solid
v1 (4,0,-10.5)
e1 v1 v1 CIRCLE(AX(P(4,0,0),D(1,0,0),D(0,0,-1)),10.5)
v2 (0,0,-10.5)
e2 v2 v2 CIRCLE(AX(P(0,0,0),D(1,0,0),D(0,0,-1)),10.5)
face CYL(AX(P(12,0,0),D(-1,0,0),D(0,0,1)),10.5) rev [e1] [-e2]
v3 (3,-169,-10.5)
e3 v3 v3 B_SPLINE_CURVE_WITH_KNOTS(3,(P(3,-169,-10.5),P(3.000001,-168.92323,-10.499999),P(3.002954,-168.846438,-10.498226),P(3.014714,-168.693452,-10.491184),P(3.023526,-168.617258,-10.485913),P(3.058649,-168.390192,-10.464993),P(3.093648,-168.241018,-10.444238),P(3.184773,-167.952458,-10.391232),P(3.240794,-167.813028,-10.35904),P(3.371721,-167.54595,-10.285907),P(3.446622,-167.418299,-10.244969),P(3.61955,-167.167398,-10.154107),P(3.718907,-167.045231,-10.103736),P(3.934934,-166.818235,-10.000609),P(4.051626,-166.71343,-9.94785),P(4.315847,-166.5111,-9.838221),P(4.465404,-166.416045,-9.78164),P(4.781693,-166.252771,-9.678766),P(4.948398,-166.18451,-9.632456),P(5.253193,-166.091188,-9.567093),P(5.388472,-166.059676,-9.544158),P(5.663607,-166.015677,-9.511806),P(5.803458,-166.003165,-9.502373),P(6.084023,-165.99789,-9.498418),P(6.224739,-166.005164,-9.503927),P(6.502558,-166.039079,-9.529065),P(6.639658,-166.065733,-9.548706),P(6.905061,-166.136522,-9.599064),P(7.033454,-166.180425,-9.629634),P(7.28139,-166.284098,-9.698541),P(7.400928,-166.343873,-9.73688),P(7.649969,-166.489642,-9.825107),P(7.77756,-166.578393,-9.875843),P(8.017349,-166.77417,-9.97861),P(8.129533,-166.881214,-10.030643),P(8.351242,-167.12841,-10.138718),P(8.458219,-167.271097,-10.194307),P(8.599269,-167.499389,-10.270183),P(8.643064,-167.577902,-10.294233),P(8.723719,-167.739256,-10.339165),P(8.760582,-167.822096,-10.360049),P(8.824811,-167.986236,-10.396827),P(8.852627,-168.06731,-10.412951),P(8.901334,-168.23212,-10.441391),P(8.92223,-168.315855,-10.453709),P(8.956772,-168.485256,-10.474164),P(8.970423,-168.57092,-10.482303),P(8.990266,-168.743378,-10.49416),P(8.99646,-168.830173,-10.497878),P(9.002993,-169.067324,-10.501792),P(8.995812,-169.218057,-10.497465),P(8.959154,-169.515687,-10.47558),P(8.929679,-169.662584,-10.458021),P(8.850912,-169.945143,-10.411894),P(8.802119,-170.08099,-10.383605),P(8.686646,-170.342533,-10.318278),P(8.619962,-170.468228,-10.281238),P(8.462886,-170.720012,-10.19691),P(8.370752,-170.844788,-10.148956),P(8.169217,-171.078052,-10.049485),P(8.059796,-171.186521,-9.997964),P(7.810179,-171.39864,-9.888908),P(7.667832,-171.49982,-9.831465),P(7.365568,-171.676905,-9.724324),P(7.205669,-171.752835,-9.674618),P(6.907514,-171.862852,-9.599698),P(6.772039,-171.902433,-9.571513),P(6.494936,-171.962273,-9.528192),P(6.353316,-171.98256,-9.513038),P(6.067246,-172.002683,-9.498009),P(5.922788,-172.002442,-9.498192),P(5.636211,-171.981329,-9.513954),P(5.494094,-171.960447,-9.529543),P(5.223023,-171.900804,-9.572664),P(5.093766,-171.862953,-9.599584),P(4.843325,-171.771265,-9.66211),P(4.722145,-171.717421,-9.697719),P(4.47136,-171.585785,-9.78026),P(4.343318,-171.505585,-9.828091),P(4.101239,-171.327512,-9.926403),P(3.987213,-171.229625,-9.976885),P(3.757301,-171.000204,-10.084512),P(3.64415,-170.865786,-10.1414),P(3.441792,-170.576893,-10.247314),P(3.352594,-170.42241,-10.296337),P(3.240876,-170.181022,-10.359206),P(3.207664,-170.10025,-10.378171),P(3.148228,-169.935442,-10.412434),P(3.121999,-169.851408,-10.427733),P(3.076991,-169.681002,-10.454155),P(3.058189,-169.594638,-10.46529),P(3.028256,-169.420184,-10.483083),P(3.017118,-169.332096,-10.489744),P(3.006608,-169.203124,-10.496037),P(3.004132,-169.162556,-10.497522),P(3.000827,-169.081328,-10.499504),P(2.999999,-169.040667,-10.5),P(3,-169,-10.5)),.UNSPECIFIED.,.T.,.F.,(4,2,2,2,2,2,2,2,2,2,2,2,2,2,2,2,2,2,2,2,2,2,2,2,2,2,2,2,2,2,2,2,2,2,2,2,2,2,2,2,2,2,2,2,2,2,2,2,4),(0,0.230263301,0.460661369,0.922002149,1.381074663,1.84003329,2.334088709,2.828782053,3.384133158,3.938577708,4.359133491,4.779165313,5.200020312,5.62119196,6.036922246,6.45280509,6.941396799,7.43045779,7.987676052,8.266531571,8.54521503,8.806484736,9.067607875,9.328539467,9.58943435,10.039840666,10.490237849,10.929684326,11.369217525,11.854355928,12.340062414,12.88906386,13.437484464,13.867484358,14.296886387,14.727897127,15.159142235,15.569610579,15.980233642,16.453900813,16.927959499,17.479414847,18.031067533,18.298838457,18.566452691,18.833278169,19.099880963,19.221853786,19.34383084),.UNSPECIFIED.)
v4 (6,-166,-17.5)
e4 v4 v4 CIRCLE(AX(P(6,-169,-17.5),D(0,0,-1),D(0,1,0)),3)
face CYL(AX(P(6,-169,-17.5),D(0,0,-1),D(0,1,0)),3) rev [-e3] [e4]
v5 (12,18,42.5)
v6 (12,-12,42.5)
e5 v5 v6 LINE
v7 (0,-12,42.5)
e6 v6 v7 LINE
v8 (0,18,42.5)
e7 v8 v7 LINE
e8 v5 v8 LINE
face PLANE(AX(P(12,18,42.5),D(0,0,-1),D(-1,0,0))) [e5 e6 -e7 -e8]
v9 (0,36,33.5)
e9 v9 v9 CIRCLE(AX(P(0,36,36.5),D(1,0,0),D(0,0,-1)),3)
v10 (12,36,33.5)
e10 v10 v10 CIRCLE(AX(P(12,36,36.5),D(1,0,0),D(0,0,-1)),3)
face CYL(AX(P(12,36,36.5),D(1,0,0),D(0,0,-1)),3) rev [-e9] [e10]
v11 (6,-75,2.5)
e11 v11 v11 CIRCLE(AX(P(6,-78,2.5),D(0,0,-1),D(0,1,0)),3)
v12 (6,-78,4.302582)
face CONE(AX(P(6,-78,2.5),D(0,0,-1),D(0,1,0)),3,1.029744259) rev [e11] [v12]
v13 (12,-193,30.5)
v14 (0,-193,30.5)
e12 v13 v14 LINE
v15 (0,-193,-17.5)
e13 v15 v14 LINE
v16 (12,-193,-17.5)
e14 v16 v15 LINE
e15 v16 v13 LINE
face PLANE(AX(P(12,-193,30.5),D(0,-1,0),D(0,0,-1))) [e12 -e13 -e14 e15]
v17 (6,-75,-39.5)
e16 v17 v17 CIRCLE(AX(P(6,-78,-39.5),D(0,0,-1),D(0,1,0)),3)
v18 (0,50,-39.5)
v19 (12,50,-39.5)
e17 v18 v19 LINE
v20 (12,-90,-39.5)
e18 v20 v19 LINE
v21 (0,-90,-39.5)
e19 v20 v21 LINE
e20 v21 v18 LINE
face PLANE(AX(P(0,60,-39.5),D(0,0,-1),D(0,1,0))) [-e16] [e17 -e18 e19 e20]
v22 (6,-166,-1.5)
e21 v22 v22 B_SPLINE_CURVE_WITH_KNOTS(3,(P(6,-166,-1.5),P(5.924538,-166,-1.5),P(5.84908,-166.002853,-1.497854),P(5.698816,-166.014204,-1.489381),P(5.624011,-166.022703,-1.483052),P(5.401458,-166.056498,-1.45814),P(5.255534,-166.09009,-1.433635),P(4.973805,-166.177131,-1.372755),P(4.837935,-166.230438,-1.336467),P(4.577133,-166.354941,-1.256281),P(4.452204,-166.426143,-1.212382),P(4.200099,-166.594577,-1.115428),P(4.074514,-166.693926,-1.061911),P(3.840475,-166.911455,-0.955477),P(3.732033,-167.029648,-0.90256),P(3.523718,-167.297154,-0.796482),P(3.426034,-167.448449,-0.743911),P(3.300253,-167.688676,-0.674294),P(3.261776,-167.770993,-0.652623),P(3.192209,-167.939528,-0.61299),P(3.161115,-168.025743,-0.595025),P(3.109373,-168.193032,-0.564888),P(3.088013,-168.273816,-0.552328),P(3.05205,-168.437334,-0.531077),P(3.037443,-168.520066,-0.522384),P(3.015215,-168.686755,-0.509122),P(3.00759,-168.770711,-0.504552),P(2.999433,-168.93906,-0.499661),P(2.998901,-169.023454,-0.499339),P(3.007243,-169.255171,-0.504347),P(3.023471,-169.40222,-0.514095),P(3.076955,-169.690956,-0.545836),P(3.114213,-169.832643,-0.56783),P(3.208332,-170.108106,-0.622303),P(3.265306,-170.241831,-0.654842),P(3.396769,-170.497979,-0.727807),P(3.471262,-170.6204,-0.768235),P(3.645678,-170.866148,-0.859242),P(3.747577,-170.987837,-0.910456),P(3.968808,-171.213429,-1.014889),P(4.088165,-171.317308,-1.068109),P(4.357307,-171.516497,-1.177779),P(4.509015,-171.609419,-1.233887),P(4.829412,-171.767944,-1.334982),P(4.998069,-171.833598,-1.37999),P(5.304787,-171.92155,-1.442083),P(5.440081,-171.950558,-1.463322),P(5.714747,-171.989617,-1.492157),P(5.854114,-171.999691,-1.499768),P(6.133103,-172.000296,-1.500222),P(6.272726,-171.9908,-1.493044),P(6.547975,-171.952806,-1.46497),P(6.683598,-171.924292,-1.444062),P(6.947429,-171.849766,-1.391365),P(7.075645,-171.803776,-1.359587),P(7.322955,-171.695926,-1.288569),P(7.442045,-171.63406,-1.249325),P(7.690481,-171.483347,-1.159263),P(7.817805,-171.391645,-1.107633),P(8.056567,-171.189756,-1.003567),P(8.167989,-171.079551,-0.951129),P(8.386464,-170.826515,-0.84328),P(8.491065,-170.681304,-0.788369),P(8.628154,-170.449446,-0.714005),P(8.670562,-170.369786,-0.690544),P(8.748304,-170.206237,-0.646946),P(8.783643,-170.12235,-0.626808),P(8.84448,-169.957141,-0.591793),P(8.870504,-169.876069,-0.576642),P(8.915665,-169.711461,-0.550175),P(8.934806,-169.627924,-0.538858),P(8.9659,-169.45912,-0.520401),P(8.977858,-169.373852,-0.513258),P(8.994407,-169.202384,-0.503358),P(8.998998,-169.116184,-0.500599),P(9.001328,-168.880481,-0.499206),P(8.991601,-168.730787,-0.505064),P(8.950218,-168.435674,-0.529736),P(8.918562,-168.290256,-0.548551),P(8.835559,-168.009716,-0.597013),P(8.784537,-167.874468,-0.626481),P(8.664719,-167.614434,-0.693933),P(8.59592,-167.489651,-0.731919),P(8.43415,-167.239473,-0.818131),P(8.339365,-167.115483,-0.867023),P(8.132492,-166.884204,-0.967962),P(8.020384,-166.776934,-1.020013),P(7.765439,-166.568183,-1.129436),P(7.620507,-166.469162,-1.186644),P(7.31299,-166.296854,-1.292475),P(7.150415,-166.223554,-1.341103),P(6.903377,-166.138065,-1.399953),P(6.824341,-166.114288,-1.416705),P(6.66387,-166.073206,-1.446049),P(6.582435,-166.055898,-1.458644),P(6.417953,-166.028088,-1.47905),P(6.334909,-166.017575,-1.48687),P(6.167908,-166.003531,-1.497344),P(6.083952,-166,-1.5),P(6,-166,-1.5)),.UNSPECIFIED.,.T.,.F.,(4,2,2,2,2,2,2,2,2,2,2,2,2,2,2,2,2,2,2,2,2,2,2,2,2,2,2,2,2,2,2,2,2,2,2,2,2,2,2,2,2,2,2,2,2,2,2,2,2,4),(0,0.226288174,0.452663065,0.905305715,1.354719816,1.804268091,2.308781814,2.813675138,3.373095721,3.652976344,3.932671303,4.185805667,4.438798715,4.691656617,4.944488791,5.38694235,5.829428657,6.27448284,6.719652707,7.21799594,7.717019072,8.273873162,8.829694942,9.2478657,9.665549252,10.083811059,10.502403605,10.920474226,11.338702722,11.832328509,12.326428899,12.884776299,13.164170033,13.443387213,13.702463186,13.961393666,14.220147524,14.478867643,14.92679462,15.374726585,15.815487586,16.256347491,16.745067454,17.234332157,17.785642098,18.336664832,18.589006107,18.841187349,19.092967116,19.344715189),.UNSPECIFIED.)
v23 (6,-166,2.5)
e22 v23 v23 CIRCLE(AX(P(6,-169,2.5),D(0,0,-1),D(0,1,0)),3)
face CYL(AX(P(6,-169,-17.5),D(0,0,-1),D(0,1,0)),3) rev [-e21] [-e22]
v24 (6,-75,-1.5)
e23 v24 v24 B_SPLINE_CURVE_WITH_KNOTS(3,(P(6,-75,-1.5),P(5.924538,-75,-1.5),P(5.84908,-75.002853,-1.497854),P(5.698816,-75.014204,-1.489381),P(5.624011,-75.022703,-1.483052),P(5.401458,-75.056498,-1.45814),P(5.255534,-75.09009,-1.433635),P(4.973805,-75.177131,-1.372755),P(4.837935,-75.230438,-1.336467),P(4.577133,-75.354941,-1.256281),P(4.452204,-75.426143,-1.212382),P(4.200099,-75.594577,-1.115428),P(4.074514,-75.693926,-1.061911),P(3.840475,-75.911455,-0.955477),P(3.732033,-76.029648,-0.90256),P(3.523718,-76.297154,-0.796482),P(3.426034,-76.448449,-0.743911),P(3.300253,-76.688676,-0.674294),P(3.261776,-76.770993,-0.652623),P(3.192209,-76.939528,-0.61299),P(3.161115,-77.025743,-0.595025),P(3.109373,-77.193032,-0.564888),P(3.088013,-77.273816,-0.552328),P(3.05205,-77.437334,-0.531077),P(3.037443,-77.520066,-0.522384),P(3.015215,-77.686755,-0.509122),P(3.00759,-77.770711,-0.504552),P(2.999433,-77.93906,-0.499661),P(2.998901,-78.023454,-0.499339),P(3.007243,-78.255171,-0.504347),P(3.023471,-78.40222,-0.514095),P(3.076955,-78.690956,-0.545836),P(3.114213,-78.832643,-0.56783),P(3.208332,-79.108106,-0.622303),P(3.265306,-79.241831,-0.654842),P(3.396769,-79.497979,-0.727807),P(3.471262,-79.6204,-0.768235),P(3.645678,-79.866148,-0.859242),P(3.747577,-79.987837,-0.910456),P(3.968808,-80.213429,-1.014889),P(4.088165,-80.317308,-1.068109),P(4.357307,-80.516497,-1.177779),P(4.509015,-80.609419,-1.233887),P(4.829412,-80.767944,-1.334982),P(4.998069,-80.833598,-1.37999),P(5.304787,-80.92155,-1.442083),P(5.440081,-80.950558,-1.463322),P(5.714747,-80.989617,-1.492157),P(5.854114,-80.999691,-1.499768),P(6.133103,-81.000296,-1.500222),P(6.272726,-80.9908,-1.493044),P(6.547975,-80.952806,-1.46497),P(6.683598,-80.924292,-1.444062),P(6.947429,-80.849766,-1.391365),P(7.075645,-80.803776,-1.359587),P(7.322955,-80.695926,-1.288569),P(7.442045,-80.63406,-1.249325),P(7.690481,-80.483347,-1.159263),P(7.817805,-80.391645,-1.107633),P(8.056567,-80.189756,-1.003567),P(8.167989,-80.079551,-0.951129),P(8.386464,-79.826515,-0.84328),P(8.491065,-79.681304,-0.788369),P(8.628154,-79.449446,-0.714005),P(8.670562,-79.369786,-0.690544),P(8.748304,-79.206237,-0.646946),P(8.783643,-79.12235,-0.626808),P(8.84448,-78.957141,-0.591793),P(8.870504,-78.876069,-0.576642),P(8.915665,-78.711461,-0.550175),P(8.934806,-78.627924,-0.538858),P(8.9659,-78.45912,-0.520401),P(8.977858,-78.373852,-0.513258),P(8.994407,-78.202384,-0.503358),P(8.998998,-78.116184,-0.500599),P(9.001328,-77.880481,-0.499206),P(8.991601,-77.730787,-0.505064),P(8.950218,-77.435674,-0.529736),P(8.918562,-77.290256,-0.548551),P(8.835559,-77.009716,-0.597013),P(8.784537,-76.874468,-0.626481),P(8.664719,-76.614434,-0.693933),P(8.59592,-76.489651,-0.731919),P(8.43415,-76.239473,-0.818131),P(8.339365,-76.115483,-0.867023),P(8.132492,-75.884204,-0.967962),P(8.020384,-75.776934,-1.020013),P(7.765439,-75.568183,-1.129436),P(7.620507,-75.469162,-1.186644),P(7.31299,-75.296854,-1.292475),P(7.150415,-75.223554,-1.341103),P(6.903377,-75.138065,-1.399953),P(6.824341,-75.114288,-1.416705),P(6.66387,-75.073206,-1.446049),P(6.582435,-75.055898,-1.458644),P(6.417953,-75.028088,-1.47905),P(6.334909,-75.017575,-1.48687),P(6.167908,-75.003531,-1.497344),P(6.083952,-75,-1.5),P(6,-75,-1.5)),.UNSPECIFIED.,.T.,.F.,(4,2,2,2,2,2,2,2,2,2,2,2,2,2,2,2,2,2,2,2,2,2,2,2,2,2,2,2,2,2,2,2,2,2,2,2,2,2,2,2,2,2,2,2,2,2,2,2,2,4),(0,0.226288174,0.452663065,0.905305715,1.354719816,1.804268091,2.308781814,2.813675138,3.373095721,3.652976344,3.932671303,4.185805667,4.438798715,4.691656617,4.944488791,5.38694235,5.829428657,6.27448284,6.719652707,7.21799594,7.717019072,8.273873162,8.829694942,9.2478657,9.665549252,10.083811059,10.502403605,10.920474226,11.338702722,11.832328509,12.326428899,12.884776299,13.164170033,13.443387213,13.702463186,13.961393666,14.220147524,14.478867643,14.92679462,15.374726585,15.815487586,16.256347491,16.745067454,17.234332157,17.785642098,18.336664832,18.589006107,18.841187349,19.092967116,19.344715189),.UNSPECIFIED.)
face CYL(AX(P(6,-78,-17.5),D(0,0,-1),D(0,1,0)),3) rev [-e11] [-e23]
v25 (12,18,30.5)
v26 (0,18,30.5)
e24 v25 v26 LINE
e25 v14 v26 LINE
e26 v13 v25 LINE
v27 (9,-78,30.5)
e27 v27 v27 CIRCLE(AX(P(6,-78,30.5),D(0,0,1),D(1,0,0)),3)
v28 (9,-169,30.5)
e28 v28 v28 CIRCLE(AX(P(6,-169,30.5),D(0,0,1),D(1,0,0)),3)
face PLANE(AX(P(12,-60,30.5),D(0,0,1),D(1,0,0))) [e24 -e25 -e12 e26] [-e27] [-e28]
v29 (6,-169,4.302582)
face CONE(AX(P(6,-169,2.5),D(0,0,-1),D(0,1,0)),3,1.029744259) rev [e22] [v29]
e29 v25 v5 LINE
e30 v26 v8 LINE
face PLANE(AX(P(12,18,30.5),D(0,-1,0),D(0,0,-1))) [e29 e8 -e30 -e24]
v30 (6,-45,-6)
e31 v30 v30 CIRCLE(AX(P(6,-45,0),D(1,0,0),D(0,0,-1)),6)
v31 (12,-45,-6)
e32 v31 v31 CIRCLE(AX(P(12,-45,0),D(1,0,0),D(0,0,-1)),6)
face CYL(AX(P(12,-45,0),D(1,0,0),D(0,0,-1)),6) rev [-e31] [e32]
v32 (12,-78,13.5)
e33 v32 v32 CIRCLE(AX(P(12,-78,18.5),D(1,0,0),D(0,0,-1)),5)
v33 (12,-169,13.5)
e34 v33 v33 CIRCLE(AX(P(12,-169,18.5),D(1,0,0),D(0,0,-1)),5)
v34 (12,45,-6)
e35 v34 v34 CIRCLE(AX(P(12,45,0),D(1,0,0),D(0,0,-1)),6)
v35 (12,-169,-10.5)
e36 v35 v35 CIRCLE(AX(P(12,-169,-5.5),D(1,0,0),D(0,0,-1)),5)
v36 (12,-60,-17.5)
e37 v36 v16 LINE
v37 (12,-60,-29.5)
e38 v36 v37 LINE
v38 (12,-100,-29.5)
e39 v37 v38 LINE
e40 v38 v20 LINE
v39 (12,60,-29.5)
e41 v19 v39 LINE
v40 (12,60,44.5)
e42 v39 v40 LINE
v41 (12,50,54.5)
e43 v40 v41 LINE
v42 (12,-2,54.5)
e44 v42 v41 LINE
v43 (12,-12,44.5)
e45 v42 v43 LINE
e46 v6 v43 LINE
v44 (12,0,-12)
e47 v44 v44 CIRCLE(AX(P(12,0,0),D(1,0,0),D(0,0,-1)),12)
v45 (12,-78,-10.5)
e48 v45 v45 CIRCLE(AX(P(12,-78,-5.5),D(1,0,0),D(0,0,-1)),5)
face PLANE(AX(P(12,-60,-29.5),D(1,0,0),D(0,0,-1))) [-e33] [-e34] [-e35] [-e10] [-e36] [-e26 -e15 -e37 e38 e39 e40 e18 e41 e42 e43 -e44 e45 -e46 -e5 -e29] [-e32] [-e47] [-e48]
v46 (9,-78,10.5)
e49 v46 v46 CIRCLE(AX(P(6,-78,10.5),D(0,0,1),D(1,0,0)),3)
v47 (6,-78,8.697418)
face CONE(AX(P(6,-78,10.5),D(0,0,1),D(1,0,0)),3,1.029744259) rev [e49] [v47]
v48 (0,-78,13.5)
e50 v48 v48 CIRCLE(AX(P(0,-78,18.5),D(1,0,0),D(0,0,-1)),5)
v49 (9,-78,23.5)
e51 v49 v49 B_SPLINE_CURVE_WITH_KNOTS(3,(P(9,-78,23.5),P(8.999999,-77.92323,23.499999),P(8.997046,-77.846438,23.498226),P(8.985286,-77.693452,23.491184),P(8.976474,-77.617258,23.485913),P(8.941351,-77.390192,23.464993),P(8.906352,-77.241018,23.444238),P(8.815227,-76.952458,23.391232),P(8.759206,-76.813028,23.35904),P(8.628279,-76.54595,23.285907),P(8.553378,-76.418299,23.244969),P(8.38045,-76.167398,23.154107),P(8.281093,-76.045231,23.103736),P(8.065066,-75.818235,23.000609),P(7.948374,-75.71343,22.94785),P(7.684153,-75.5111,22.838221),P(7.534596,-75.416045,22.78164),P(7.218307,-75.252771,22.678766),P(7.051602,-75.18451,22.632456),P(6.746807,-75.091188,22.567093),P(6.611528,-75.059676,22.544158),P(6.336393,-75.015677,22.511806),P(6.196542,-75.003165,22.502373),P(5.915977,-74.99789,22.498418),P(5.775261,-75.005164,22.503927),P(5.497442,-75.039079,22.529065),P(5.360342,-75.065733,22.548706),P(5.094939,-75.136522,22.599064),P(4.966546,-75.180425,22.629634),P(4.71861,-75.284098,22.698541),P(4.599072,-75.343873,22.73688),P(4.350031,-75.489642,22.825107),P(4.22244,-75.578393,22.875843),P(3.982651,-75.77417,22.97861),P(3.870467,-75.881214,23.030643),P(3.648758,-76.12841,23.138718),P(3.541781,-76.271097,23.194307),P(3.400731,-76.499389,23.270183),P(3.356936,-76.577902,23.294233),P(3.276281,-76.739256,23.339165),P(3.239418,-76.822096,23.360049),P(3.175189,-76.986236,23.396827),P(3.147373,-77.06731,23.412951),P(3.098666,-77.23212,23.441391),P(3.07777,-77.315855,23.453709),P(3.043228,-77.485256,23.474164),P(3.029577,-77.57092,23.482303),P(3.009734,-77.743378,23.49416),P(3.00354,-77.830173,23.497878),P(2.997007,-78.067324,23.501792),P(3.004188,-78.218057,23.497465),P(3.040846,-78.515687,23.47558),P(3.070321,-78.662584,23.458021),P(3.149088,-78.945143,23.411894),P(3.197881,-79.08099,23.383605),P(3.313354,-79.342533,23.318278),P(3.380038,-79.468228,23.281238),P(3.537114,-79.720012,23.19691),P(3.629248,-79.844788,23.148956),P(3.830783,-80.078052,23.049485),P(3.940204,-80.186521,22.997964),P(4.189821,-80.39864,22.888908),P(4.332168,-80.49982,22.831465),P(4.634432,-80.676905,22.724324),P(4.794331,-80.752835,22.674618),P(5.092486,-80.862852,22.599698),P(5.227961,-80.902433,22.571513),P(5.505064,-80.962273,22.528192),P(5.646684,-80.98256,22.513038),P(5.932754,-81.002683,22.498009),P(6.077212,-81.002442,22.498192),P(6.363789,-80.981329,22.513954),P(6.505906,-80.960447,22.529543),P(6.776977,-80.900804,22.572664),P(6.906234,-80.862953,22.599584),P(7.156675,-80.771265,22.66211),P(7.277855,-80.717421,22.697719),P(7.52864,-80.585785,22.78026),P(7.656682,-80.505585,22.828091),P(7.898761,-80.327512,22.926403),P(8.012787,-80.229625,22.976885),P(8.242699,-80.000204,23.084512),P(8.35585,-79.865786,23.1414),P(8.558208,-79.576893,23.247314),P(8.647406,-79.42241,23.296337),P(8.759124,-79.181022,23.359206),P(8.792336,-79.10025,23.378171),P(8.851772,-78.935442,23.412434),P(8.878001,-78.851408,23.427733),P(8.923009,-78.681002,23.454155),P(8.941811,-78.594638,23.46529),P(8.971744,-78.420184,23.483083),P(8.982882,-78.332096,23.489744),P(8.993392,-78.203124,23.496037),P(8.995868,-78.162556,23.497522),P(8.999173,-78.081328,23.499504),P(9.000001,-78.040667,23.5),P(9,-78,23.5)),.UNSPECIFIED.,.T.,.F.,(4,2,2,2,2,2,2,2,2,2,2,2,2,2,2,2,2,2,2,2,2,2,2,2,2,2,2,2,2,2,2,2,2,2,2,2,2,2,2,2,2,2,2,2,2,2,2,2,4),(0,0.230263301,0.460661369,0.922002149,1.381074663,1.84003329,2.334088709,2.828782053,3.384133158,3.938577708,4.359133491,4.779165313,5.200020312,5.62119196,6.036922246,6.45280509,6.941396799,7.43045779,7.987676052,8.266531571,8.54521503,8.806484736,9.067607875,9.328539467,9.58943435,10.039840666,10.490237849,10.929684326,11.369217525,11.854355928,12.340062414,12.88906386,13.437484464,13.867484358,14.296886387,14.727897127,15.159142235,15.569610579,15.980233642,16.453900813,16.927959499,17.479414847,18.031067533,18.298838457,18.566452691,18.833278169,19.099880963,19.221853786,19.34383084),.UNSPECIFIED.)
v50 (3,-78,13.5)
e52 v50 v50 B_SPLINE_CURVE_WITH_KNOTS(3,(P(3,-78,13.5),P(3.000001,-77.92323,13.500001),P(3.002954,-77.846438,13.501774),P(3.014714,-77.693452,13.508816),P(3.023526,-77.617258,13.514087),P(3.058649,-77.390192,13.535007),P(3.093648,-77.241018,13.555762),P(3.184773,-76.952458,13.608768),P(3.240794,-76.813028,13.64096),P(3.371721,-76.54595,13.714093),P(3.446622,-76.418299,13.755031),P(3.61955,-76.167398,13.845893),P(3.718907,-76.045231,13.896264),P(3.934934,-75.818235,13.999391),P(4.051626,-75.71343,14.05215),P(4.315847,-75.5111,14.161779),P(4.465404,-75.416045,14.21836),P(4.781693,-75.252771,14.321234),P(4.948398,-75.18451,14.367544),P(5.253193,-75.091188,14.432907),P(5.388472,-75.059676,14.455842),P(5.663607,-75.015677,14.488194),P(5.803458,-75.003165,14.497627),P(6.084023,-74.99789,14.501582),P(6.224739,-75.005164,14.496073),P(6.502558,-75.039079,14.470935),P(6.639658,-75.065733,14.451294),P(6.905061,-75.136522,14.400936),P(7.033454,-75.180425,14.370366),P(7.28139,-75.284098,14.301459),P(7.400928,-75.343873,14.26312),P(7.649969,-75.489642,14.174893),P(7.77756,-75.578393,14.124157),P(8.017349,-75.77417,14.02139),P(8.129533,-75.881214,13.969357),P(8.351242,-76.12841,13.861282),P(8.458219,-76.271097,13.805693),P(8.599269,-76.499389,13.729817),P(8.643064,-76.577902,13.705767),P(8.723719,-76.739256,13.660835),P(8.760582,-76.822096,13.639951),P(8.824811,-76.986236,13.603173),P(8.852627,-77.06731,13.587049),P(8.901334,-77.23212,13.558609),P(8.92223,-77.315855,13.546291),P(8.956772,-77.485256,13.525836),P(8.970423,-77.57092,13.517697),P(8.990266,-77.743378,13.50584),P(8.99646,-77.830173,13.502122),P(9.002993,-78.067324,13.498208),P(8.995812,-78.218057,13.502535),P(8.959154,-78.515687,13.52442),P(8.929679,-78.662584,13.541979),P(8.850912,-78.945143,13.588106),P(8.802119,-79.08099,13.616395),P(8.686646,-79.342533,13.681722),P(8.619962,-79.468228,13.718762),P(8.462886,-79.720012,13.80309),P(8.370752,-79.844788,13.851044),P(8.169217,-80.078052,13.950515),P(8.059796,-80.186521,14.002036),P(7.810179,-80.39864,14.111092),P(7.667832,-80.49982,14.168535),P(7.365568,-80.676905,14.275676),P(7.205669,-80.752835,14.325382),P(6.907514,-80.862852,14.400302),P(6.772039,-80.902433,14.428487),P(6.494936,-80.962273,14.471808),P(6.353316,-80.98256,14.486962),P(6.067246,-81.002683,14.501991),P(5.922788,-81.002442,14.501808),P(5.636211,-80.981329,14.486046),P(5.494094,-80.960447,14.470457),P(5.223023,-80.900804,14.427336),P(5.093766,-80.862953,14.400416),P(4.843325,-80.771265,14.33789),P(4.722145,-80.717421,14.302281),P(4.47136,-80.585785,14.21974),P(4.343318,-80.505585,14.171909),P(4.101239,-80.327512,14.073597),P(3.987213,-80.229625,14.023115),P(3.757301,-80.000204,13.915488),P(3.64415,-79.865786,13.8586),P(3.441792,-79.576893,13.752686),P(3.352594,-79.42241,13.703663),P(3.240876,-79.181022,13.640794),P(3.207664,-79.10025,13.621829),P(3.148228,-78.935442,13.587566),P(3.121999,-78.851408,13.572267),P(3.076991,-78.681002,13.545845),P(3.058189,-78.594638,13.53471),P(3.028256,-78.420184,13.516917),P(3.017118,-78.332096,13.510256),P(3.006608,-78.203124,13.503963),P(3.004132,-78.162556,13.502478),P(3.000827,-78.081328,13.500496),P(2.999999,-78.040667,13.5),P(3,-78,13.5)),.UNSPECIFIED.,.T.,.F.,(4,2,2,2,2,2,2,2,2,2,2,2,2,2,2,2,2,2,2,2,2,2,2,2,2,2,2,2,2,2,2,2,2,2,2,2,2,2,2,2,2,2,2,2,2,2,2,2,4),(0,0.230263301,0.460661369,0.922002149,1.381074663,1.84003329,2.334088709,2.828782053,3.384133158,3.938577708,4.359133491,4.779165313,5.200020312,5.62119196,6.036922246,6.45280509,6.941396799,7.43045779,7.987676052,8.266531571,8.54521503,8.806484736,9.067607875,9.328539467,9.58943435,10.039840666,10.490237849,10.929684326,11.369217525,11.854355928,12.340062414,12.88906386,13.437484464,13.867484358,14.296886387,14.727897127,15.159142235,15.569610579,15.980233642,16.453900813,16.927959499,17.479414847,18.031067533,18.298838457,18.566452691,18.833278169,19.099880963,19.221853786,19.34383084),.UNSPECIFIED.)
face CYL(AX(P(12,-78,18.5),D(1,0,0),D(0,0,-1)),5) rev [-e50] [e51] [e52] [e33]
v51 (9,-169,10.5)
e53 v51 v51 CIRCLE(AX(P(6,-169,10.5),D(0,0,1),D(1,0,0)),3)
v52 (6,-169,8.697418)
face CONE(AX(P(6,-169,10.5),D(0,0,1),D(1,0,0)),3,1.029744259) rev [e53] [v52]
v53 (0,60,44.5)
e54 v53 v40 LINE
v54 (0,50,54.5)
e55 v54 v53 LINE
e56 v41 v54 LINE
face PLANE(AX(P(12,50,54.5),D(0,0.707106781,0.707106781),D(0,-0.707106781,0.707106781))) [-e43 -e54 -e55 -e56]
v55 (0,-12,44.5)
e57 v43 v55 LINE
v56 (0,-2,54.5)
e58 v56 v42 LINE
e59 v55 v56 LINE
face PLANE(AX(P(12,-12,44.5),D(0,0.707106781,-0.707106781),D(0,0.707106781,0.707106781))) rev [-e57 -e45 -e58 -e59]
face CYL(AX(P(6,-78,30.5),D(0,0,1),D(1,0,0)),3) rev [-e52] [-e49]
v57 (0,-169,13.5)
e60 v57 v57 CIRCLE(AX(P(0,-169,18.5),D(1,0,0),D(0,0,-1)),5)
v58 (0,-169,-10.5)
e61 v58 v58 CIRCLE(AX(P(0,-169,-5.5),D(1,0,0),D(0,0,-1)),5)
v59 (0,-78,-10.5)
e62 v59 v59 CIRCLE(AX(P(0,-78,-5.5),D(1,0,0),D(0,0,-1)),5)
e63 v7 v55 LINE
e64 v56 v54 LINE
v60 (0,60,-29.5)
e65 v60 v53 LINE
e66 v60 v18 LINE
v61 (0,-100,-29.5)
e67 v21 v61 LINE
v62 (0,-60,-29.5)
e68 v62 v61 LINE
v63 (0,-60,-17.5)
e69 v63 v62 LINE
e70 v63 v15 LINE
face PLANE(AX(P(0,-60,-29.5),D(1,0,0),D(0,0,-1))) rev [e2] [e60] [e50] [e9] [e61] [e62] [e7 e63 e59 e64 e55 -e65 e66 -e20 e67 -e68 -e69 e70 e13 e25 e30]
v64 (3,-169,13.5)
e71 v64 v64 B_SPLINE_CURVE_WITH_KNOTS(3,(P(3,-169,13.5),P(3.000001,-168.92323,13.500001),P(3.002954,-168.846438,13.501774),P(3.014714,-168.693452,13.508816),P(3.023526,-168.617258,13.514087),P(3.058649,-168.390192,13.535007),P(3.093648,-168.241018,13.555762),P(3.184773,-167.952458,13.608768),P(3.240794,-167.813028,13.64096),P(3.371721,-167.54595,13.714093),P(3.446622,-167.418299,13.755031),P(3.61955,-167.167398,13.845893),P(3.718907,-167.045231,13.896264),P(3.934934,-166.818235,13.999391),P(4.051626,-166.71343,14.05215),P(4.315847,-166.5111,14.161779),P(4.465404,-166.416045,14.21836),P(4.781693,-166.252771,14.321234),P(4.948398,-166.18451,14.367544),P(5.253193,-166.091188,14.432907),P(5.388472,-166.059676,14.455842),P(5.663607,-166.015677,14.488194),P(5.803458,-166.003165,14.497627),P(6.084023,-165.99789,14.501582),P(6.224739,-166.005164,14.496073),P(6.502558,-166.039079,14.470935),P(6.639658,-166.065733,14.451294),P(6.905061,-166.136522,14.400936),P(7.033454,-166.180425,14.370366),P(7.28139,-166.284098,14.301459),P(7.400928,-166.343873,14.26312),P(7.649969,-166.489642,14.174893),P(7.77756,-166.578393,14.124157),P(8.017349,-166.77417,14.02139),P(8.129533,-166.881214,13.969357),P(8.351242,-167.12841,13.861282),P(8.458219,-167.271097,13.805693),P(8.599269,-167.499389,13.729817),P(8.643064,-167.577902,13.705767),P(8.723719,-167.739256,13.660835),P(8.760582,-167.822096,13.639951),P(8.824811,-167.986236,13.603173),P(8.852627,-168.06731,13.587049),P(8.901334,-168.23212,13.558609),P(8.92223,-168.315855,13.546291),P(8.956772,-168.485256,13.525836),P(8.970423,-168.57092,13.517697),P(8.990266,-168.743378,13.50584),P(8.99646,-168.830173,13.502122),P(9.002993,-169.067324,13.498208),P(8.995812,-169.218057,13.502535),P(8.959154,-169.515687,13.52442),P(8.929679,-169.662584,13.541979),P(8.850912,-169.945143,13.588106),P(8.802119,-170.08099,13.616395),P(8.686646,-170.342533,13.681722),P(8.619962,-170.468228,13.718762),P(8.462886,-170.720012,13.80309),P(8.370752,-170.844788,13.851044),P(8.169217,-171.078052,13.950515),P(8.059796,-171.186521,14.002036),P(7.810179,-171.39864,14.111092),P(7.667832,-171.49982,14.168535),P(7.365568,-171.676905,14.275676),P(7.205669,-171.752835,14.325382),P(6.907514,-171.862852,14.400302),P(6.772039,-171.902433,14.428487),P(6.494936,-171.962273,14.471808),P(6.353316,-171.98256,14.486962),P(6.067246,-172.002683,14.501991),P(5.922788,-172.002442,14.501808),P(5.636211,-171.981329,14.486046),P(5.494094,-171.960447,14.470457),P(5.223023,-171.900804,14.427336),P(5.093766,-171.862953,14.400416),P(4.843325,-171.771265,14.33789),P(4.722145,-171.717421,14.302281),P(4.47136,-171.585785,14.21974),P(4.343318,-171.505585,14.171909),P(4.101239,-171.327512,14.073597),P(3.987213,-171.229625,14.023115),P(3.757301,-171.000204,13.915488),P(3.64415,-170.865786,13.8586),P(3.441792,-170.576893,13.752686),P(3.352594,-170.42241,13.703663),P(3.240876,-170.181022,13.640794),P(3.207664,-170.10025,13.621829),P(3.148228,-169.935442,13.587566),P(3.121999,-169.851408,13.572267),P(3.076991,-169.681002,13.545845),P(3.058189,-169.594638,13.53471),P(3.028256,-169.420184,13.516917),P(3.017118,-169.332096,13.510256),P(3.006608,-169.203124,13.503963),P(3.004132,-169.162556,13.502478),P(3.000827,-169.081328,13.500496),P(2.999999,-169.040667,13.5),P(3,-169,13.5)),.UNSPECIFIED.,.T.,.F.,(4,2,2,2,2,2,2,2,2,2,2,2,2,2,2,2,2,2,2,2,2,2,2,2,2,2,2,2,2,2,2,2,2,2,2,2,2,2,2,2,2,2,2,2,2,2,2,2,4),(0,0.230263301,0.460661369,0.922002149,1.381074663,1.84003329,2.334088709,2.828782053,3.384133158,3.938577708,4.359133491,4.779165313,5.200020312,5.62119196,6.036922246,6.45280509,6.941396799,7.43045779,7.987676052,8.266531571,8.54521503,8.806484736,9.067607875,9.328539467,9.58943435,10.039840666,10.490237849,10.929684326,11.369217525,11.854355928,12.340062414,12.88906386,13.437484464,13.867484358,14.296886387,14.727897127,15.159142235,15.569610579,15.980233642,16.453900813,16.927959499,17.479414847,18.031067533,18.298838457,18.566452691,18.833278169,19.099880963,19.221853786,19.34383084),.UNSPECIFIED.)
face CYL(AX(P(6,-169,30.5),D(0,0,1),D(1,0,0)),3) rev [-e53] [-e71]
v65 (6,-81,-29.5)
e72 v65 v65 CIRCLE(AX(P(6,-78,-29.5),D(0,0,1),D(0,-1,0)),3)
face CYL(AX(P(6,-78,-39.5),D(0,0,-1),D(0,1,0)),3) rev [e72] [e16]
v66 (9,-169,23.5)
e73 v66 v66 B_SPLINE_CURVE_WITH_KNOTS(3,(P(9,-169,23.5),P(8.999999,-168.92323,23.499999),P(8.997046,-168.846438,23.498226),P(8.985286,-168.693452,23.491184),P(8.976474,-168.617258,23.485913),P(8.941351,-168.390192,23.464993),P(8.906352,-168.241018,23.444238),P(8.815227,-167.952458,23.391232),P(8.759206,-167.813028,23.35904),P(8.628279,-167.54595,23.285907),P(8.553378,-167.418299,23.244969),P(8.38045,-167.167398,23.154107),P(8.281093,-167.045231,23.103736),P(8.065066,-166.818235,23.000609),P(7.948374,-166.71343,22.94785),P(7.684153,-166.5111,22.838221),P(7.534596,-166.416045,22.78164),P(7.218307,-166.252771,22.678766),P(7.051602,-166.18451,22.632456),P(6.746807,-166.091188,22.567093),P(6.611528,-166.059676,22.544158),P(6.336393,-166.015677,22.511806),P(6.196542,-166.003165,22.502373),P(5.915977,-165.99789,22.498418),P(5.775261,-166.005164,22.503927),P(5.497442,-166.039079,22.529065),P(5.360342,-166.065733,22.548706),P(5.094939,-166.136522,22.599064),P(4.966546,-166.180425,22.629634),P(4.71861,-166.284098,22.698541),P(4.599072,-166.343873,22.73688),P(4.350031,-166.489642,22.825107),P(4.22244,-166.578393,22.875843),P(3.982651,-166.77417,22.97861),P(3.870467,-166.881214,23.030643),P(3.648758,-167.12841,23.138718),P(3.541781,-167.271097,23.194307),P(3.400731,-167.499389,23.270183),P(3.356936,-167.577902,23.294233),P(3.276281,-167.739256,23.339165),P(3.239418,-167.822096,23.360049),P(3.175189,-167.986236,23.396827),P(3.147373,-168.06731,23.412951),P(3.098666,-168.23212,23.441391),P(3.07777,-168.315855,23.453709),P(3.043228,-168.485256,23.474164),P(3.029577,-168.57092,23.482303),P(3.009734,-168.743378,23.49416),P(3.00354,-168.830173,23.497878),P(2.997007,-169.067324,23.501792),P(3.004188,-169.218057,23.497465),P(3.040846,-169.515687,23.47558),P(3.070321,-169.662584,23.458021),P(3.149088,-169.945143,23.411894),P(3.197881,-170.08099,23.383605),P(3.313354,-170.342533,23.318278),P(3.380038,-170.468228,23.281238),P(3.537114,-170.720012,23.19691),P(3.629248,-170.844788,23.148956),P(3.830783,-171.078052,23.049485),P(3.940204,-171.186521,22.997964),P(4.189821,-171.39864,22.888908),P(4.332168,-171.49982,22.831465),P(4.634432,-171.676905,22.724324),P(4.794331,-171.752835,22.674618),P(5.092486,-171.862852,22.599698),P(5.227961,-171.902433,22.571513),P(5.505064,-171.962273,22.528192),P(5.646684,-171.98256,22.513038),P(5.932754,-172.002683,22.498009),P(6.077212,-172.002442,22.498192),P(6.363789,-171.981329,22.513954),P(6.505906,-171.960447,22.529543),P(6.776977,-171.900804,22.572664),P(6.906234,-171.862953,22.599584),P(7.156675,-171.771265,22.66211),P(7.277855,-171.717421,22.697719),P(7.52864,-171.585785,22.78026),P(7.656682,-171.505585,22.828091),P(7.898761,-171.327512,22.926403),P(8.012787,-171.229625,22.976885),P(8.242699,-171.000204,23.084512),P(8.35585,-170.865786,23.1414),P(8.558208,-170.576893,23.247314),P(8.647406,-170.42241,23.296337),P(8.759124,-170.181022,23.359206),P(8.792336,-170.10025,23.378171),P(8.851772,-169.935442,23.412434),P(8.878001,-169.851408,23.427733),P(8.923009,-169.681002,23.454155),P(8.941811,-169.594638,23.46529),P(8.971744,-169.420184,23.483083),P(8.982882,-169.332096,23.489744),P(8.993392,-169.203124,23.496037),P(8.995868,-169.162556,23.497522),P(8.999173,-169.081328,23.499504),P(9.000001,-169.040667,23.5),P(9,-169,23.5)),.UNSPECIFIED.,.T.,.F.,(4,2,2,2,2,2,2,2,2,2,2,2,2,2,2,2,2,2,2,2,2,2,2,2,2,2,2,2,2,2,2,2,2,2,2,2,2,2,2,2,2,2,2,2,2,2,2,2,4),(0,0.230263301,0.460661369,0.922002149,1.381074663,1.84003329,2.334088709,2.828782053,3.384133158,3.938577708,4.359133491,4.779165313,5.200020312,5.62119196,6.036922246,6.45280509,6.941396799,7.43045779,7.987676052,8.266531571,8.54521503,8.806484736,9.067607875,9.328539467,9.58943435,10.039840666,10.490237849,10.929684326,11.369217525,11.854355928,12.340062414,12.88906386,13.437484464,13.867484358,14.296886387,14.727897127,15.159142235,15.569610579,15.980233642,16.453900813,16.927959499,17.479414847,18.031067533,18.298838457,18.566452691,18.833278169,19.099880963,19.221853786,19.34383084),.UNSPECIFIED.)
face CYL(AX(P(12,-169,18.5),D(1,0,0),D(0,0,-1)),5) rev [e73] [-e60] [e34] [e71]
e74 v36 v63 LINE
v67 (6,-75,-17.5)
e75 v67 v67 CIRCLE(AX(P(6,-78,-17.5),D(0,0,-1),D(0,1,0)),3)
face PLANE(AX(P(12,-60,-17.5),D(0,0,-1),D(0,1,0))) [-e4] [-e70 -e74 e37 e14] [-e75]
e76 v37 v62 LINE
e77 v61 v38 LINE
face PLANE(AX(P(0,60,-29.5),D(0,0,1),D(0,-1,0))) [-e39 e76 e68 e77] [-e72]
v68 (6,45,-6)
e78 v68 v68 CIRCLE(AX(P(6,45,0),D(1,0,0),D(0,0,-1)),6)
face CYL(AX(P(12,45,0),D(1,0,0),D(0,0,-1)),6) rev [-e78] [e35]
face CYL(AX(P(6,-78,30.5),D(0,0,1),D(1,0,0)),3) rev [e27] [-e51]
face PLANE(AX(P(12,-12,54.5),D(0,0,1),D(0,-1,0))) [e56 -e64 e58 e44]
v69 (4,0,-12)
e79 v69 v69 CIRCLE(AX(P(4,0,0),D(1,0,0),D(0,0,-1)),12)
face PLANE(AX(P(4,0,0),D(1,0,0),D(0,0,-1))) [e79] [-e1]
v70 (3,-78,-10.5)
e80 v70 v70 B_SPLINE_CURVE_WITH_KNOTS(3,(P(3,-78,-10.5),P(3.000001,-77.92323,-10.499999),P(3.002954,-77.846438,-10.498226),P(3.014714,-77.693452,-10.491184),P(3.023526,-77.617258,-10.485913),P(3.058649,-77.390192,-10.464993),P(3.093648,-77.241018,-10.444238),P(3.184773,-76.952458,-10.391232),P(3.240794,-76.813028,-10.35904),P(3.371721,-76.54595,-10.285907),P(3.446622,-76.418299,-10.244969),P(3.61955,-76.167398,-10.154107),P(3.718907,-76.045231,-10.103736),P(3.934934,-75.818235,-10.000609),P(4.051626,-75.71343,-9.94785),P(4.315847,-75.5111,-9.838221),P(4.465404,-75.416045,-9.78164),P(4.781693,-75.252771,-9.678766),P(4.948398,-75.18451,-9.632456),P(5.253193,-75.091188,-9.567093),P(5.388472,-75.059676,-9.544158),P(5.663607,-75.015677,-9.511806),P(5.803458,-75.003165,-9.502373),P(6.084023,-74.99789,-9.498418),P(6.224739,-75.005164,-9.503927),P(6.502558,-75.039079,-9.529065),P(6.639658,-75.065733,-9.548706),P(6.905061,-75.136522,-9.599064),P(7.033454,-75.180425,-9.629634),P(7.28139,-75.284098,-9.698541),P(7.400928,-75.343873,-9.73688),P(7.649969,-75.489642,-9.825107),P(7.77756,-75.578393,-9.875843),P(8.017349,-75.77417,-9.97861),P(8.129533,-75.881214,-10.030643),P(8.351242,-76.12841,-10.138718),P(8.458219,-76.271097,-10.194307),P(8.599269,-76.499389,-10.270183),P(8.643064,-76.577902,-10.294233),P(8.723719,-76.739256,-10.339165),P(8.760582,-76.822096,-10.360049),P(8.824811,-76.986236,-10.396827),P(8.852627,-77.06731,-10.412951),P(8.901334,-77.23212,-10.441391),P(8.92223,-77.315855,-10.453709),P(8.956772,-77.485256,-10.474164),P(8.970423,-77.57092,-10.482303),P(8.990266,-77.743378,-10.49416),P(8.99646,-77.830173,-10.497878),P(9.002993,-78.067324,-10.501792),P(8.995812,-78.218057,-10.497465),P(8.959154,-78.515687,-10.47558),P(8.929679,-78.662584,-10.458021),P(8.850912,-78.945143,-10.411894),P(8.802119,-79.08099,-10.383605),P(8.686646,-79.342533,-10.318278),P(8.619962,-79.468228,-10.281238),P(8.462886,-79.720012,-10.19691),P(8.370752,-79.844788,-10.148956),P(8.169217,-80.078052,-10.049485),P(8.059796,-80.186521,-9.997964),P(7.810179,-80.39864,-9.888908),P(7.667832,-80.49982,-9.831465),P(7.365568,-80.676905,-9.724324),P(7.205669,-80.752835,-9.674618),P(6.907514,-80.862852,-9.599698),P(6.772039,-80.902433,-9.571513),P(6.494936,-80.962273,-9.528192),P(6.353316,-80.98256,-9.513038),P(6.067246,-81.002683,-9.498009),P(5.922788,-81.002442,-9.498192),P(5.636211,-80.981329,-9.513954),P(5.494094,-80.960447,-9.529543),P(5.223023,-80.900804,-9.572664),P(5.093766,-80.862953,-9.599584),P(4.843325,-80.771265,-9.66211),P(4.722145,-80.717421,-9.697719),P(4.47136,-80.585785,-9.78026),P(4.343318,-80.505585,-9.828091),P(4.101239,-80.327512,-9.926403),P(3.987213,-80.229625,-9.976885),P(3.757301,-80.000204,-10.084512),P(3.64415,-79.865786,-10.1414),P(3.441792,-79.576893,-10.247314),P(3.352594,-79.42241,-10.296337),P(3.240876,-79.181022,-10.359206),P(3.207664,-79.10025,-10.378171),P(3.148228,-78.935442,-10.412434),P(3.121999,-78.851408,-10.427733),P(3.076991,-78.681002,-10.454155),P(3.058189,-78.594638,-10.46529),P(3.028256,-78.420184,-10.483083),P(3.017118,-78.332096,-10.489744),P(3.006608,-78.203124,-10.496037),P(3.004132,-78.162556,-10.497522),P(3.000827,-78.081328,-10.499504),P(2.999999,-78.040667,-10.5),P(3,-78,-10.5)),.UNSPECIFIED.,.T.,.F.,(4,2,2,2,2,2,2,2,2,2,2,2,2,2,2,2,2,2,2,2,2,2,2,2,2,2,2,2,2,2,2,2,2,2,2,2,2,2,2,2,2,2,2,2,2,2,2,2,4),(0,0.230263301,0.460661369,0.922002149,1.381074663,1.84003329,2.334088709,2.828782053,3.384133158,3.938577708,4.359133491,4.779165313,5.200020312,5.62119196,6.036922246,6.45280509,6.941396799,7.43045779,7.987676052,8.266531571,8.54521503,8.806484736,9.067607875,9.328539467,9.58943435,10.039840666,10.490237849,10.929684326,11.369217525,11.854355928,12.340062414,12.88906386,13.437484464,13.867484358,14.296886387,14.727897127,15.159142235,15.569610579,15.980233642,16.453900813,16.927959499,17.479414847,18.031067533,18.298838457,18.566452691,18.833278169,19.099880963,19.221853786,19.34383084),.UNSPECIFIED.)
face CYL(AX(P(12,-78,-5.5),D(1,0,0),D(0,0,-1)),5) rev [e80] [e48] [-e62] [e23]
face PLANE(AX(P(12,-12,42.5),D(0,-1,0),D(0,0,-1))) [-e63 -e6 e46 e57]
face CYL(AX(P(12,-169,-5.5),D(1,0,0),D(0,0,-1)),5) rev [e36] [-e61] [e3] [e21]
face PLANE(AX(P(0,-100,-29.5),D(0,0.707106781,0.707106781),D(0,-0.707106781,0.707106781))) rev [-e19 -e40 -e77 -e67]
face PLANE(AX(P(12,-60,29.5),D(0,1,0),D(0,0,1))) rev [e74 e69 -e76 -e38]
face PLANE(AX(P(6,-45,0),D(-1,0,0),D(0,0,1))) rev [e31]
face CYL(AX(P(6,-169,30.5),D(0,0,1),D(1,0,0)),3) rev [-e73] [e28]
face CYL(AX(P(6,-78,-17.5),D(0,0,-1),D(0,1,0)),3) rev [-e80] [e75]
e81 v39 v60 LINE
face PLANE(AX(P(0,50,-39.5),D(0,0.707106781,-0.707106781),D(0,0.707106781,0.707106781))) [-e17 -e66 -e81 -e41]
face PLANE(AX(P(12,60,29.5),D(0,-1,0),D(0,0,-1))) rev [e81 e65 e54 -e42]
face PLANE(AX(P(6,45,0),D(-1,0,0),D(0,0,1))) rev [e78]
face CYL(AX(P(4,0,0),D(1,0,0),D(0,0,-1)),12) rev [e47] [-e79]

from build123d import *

# Parameters (mm, degrees)
SKETCH1_W                         = 59
SKETCH1_H                         = 120
SKETCH1_R                         = 10.5
BOSS_EXTRUDE1_DEPTH               = 12
BOSS_EXTRUDE2_DEPTH               = 12
SKETCH9_W                         = 48
SKETCH9_H                         = 133
BOSS_EXTRUDE3_DEPTH               = 12
SKETCH11_W                        = 10
SKETCH11_H                        = 160
BOSS_EXTRUDE4_DEPTH               = 12
CHAMFER1_SIZE                     = 10
CHAMFER2_SIZE                     = 10
F_10_0_10_DIAMETER_HOLE1_D        = 10
F_6_0_6_DIAMETER_HOLE1_AT_2_COUNT = 2
F_6_0_6_DIAMETER_HOLE1_AT_2_PITCH = 91
F_6_0_6_DIAMETER_HOLE3_D          = 6
F_6_0_6_DIAMETER_HOLE3_DEPTH      = 20
F_6_0_6_DIAMETER_HOLE3_TIP        = 1.802581857
F_6_0_6_DIAMETER_HOLE4_D          = 6
F_6_0_6_DIAMETER_HOLE5_D          = 6
F_6_0_6_DIAMETER_HOLE5_DEPTH      = 20
F_6_0_6_DIAMETER_HOLE5_TIP        = 1.802581857
HOLE2_D                           = 12
HOLE2_DEPTH                       = 6
SKETCH27_R                        = 12
CUT_EXTRUDE1_DEPTH                = 8


with BuildPart() as part:
    # Sketch1 → Boss-Extrude1 (new body)
    with BuildSketch(Plane(origin=(0, 0, 0), x_dir=(0, 0, -1), z_dir=(1, 0, 0))):
        Rectangle(SKETCH1_W, SKETCH1_H)
        Circle(SKETCH1_R, mode=Mode.SUBTRACT)
    extrude(amount=BOSS_EXTRUDE1_DEPTH)

    # Sketch8 → Boss-Extrude2 (add)
    with BuildSketch(Plane.ZY):
        Polygon((42.5, 18), (42.5, -12), (54.5, -12), (54.5, 60), (29.5, 60), (29.5, -60), (30.5, -60), (30.5, 18), align=None)
    extrude(amount=-BOSS_EXTRUDE2_DEPTH)

    # Sketch9 → Boss-Extrude3 (add)
    with BuildSketch(Plane.ZY):
        with Locations((6.5, -126.5)):
            Rectangle(SKETCH9_W, SKETCH9_H)
    extrude(amount=-BOSS_EXTRUDE3_DEPTH)

    # Sketch11 → Boss-Extrude4 (add)
    with BuildSketch(Plane(origin=(12, 0, 0), x_dir=(0, 0, -1), z_dir=(1, 0, 0))):
        with Locations((34.5, -20)):
            Rectangle(SKETCH11_W, SKETCH11_H)
    extrude(amount=-BOSS_EXTRUDE4_DEPTH)

    # Chamfer1
    chamfer1_edges = [part.edges().sort_by_distance(p)[0] for p in [
        (6, 60, 54.5),
        (6, -12, 54.5),
        (6, 60, -39.5),
    ]]
    chamfer(chamfer1_edges, length=CHAMFER1_SIZE)

    # Chamfer2
    chamfer2_edges = [part.edges().sort_by_distance(p)[0] for p in [
        (6, -100, -39.5),
    ]]
    chamfer(chamfer2_edges, length=CHAMFER2_SIZE - 0.0001)  # a hair under: the kernel refuses the full size

    # Ø10.0 (10) Diameter Hole1 (through all)
    with Locations(Plane(origin=(12, 0, 0), x_dir=(0, 0, -1), z_dir=(1, 0, 0))):
        with Locations((-18.5, -169), (5.5, -169), (-18.5, -78), (5.5, -78)):
            Hole(F_10_0_10_DIAMETER_HOLE1_D / 2)

    # Sketch15 → Ø6.0 (6) Diameter Hole1 (revolve, cut)
    with BuildSketch(Plane(origin=(6, -169, -17.5), x_dir=(0, 1, 0), z_dir=(1, 0, 0))):
        Polygon((0, 0), (0, 21.802581857), (3, 20), (3, 0), align=None)
    f_6_0_6_diameter_hole1 = revolve(axis=Axis((6, -169, -23.85), (0, 0, 1)), mode=Mode.SUBTRACT)

    # Ø6.0 (6) Diameter Hole1 at 2: Ø6.0 (6) Diameter Hole1 ×2
    with Locations(*[(0, i * F_6_0_6_DIAMETER_HOLE1_AT_2_PITCH, 0) for i in range(1, F_6_0_6_DIAMETER_HOLE1_AT_2_COUNT)]):
        add(f_6_0_6_diameter_hole1, mode=Mode.SUBTRACT)

    # Ø6.0 (6) Diameter Hole3
    with Locations(Plane(origin=(0, 0, -39.5), x_dir=(-1, 0, 0), z_dir=(0, 0, -1))):
        with Locations((-6, -78)):
            Hole(F_6_0_6_DIAMETER_HOLE3_D / 2, depth=F_6_0_6_DIAMETER_HOLE3_DEPTH)
            with Locations((0, 0, -(F_6_0_6_DIAMETER_HOLE3_DEPTH + F_6_0_6_DIAMETER_HOLE3_TIP / 2))):  # 118° drill point
                Cone(0, F_6_0_6_DIAMETER_HOLE3_D / 2, F_6_0_6_DIAMETER_HOLE3_TIP, mode=Mode.SUBTRACT)

    # Ø6.0 (6) Diameter Hole4 (through all)
    with Locations(Plane(origin=(12, 0, 0), x_dir=(0, 0, -1), z_dir=(1, 0, 0))):
        with Locations((-36.5, 36)):
            Hole(F_6_0_6_DIAMETER_HOLE4_D / 2)

    # Ø6.0 (6) Diameter Hole5
    with Locations(Plane.XY.offset(30.5)):
        with Locations((6, -78), (6, -169)):
            Hole(F_6_0_6_DIAMETER_HOLE5_D / 2, depth=F_6_0_6_DIAMETER_HOLE5_DEPTH)
            with Locations((0, 0, -(F_6_0_6_DIAMETER_HOLE5_DEPTH + F_6_0_6_DIAMETER_HOLE5_TIP / 2))):  # 118° drill point
                Cone(0, F_6_0_6_DIAMETER_HOLE5_D / 2, F_6_0_6_DIAMETER_HOLE5_TIP, mode=Mode.SUBTRACT)

    # Hole2
    with Locations(Plane(origin=(12, 0, 0), x_dir=(0, 0, -1), z_dir=(1, 0, 0))):
        with Locations((0, -45), (0, 45)):
            Hole(HOLE2_D / 2, depth=HOLE2_DEPTH)

    # Sketch27 → Cut-Extrude1 (cut)
    with BuildSketch(Plane(origin=(12, 0, 0), x_dir=(0, 0, -1), z_dir=(1, 0, 0))):
        Circle(SKETCH27_R)
    extrude(amount=-CUT_EXTRUDE1_DEPTH, mode=Mode.SUBTRACT)


solid = part.part
